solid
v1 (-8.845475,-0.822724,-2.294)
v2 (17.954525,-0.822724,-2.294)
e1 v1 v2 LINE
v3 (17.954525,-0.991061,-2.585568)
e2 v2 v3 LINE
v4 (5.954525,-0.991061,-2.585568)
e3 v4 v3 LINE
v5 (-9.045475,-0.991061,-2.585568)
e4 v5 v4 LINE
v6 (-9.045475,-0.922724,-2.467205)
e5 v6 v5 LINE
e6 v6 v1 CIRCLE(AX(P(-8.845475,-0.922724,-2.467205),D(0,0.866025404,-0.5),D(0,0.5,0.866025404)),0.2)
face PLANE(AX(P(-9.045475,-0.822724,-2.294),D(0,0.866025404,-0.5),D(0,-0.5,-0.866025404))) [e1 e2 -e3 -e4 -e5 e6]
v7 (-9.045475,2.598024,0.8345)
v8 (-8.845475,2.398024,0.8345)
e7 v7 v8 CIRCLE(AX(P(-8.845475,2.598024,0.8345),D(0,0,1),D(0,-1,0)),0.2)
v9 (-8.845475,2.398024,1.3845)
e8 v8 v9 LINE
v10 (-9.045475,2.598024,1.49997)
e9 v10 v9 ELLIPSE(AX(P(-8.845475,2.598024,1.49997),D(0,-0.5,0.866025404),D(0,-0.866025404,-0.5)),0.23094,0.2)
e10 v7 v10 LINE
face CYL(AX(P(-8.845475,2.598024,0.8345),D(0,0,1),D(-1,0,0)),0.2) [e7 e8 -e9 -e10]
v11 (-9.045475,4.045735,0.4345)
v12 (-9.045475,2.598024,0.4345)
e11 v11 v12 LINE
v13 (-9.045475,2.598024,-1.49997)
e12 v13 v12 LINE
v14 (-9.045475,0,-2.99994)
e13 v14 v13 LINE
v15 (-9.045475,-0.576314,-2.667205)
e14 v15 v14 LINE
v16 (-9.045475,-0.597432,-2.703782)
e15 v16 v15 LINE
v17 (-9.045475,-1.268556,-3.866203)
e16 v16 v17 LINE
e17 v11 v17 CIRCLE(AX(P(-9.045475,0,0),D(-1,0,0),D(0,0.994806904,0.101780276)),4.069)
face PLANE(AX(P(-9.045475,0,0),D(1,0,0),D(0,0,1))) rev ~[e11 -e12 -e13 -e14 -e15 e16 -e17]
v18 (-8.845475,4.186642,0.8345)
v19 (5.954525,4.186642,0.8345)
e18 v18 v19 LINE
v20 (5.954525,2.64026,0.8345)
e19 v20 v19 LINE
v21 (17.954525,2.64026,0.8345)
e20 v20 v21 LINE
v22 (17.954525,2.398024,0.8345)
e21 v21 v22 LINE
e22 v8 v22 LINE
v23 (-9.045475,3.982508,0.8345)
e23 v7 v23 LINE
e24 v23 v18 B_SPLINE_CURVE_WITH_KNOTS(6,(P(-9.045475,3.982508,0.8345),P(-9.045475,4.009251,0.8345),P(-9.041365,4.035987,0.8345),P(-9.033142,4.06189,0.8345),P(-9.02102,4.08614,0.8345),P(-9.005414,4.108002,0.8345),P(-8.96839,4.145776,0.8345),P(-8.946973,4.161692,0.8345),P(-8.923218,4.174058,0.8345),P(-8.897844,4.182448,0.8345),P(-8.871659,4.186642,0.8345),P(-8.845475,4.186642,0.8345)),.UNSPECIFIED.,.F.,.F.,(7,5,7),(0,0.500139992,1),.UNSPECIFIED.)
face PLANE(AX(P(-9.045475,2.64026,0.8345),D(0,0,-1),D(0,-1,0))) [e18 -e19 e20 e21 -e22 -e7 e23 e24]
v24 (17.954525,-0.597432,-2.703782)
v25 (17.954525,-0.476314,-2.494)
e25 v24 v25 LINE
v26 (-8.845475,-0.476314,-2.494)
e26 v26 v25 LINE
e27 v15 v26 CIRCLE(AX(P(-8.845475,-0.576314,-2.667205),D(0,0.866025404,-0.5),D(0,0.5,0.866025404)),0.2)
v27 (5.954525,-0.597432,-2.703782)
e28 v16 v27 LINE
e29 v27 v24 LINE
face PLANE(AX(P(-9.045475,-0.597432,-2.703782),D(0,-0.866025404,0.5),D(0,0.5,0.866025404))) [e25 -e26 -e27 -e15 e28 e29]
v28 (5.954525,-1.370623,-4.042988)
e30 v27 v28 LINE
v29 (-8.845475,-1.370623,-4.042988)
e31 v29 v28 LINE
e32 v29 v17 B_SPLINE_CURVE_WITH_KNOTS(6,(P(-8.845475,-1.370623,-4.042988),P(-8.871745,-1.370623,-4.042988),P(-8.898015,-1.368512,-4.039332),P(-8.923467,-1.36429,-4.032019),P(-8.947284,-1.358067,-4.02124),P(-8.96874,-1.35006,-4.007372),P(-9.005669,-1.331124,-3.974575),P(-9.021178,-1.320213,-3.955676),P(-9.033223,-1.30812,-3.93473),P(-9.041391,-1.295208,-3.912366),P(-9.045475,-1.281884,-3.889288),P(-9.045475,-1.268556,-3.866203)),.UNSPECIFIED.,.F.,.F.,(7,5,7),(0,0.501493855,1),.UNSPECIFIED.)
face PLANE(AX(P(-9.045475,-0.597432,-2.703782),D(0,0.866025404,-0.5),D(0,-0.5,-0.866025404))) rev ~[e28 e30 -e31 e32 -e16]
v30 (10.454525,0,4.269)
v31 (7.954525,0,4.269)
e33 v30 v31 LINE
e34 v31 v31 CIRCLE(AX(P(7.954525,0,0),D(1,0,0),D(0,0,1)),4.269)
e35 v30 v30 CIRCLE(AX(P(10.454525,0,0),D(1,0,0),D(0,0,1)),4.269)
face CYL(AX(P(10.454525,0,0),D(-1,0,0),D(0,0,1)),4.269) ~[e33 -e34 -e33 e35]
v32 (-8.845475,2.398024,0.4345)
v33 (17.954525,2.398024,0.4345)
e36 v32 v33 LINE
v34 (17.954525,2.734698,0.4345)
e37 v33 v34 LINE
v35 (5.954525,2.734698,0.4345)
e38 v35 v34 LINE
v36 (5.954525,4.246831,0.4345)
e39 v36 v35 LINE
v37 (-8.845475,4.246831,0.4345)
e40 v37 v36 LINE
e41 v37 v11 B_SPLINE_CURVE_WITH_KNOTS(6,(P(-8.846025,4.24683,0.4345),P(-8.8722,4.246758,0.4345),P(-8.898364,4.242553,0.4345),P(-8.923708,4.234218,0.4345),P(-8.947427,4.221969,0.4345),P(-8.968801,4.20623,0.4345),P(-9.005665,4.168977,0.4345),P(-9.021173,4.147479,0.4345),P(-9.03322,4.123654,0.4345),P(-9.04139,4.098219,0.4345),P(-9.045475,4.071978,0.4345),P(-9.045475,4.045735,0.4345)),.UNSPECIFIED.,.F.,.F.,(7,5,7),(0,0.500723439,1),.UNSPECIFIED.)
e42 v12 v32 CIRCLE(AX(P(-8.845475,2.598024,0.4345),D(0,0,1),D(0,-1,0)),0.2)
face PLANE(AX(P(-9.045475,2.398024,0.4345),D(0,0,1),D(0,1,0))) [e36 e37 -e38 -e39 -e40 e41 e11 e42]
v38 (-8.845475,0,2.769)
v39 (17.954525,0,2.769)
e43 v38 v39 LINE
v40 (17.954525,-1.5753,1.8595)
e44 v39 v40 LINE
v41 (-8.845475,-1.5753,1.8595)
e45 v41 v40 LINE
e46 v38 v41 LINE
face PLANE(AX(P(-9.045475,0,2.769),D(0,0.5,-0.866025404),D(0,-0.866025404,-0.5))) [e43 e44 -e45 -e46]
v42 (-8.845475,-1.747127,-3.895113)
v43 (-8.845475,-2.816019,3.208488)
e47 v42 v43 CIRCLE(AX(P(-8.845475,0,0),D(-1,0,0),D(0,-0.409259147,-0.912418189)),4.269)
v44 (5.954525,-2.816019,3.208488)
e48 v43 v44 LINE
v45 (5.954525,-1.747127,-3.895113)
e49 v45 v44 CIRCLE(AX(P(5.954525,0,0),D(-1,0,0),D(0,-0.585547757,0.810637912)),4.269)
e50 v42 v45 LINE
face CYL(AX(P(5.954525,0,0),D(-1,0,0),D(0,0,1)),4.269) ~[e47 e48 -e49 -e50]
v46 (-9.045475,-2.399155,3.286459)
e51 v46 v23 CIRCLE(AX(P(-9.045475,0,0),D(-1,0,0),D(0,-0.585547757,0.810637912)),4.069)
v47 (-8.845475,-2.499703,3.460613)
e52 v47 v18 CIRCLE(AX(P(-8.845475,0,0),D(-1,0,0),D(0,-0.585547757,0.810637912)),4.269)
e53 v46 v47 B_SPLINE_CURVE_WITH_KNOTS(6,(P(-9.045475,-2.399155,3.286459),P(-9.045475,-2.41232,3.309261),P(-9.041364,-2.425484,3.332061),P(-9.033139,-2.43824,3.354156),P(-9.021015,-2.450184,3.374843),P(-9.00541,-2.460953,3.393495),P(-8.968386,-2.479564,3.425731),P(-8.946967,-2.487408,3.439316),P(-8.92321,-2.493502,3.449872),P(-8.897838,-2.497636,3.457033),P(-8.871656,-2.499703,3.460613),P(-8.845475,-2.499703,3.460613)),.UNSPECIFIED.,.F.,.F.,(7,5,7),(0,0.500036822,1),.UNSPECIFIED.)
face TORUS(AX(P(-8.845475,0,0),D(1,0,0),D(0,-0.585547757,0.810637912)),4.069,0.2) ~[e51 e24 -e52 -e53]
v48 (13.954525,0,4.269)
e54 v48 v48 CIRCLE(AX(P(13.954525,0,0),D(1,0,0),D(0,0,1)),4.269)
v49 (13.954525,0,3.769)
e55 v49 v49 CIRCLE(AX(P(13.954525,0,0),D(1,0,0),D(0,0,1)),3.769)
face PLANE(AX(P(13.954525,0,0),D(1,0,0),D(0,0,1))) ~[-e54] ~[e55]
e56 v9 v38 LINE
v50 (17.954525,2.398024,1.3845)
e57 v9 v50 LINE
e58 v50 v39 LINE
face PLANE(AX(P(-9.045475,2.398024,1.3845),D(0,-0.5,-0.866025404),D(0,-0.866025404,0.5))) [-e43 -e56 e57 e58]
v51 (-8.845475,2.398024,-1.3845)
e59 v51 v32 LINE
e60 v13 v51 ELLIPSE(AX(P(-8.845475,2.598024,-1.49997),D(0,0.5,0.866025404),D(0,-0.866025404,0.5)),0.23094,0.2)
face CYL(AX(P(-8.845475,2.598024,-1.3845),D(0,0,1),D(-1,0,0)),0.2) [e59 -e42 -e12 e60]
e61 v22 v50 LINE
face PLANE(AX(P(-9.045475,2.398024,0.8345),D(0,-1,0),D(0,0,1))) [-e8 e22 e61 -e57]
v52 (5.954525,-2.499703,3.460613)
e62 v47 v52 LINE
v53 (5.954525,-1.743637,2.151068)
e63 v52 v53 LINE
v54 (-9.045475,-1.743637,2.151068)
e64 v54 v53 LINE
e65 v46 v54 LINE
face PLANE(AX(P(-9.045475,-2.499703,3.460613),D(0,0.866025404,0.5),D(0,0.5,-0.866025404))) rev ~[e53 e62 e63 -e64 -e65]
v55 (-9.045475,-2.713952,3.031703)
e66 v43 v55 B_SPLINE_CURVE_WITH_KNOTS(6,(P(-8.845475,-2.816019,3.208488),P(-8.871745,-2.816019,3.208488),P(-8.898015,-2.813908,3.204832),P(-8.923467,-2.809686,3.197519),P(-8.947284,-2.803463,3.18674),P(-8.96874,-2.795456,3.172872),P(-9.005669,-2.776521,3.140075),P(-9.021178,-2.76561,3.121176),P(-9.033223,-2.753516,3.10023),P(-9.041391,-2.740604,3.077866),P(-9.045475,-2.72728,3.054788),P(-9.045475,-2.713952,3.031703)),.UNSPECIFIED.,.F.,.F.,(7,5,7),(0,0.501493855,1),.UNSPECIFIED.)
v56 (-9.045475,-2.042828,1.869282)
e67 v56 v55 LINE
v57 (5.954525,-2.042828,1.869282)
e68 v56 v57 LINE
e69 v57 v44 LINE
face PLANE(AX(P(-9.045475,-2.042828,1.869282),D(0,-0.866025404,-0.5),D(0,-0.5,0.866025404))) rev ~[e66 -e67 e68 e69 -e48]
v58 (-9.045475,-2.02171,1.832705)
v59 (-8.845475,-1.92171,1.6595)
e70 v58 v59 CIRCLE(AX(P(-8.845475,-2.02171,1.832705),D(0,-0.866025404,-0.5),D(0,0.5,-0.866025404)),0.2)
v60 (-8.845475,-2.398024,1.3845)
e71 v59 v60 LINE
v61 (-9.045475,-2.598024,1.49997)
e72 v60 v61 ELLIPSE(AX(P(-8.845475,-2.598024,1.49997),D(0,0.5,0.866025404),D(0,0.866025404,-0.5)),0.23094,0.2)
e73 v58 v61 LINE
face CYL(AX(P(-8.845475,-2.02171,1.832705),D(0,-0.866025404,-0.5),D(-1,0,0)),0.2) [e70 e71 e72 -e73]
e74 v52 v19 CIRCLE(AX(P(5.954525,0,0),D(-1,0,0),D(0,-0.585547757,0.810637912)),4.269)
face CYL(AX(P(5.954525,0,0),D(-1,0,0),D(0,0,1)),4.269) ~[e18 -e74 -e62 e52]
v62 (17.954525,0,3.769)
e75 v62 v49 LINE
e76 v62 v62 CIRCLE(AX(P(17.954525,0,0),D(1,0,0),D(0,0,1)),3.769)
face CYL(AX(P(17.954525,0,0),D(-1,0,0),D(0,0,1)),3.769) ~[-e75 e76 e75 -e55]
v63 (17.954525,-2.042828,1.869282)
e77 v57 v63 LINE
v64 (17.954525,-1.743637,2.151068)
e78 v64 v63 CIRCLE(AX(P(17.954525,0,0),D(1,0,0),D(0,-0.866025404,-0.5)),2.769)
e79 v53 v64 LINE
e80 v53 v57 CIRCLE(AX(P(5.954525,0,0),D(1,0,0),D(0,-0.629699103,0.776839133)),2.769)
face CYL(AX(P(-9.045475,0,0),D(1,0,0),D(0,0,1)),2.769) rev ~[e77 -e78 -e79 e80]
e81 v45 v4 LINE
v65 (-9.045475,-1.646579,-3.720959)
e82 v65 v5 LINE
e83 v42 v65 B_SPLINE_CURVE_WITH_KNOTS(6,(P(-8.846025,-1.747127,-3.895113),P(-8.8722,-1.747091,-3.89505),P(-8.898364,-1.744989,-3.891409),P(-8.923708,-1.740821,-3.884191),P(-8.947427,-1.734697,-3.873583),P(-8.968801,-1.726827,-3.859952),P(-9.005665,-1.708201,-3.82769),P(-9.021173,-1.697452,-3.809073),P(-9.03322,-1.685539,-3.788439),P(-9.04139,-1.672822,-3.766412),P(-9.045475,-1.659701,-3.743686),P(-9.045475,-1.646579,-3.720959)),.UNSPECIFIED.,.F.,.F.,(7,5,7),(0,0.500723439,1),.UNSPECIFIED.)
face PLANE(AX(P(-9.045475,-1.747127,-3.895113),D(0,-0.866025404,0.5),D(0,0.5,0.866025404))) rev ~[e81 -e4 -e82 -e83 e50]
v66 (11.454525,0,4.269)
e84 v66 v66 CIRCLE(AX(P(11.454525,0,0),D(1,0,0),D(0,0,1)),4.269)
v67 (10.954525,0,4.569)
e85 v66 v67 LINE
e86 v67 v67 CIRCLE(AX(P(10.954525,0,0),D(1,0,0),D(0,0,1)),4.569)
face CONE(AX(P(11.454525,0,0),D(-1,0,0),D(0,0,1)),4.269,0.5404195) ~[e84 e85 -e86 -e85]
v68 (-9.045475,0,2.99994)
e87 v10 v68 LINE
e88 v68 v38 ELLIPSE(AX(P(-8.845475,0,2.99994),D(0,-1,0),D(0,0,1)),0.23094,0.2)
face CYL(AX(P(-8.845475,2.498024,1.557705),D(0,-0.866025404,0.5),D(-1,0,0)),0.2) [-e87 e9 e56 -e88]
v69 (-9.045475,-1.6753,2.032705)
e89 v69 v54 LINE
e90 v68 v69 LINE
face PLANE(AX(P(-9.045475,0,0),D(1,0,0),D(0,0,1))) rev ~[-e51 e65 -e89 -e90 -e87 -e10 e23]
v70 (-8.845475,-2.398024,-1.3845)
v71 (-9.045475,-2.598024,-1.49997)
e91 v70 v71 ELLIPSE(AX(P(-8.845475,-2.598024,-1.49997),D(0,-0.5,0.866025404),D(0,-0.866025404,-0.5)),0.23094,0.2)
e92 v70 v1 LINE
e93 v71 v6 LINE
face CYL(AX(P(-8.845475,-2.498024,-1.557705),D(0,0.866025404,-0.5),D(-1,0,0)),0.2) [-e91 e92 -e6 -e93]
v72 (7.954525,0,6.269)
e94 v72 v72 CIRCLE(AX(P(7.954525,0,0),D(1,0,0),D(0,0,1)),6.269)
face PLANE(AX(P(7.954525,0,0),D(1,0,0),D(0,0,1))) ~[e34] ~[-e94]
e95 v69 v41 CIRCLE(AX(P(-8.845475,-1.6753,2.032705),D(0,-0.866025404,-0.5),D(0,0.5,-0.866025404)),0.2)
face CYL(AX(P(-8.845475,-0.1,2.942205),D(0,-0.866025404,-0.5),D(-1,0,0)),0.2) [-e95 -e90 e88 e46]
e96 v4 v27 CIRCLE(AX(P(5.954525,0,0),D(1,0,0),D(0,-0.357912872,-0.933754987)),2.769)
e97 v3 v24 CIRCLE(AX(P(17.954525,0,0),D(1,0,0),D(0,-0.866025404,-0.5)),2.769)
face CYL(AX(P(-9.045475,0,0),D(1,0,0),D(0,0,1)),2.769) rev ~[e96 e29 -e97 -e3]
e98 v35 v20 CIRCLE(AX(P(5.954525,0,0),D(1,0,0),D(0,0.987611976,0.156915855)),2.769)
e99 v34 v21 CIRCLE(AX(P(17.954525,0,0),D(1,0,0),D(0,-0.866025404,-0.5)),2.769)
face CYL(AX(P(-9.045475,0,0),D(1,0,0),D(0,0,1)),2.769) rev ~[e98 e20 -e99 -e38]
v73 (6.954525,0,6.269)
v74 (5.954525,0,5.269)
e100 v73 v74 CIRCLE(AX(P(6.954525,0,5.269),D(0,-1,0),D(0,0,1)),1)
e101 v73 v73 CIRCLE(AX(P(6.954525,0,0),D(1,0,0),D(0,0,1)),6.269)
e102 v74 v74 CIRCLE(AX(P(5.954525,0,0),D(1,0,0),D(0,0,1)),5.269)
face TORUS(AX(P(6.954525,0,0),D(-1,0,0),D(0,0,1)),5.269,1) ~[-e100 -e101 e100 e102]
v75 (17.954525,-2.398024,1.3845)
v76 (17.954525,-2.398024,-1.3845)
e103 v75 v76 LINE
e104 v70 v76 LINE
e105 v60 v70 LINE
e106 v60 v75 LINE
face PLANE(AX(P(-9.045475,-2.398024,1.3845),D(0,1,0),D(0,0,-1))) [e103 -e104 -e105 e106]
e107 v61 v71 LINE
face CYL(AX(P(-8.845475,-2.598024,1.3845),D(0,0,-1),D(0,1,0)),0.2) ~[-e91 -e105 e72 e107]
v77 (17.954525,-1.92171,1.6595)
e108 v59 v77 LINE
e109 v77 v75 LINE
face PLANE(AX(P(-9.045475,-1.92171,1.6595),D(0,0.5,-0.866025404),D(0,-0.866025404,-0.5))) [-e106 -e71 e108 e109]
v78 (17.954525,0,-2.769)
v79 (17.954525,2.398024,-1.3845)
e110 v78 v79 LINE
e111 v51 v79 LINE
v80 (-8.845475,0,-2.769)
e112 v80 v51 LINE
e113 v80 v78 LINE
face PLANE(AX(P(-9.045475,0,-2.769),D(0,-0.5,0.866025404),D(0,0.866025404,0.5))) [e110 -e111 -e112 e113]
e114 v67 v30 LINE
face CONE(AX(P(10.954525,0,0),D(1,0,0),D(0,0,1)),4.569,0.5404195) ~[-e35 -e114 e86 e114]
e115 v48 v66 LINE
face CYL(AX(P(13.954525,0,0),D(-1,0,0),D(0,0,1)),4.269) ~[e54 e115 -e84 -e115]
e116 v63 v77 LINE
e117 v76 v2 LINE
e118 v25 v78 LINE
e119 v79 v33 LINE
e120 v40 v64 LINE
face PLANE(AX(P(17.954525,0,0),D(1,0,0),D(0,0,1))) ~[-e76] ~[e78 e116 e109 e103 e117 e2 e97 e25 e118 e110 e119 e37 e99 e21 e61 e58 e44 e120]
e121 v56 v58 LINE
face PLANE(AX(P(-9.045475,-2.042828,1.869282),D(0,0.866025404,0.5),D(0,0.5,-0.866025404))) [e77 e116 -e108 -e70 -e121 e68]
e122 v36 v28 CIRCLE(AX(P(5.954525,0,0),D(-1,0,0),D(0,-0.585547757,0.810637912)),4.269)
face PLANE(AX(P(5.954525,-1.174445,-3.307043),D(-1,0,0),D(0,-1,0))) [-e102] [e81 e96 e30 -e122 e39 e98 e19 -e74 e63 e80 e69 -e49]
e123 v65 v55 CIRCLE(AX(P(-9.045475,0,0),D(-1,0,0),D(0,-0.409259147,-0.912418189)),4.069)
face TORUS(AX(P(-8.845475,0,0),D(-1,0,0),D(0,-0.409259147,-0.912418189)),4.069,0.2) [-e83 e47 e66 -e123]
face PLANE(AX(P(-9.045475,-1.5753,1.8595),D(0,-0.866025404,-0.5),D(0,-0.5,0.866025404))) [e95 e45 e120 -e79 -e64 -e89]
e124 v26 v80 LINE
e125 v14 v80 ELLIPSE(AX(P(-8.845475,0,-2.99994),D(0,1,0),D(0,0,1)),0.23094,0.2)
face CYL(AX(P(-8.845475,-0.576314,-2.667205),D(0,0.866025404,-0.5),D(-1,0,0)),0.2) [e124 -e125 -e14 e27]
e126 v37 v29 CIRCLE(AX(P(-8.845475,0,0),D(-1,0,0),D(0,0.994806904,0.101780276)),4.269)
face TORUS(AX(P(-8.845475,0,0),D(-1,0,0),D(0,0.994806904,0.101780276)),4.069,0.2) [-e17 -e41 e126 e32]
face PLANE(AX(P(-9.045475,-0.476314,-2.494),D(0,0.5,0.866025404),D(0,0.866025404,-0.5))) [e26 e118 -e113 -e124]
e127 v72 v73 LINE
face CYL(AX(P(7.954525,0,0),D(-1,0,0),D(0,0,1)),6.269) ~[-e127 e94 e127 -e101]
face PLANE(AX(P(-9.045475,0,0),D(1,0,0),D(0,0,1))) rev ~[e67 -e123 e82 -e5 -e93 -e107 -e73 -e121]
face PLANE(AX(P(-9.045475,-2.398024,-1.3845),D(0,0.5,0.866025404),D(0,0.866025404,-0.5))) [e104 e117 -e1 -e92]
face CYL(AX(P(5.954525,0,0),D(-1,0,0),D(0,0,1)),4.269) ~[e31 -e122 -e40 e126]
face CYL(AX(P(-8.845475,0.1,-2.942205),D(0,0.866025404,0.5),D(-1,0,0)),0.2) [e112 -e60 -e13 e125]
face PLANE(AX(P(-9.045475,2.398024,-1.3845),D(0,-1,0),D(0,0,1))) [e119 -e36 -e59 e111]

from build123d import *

# Parameters (mm, degrees)
F2_R     = 1
F4_DEPTH = 27
F5_DEPTH = 27
F6_DEPTH = 15
F7_DEPTH = 15
F8_DEPTH = 15
F9_R     = 0.2


with BuildPart() as f1:
    # F0 (on Front) → F1 (revolve)
    with BuildSketch(Plane.XZ):
        Polygon((-9.0454753935, 4.269), (-9.0454753935, 2.769), (17.9545246065, 2.769), (17.9545246065, 3.769), (13.9545246065, 3.769), (13.9545246065, 4.269), (11.4545246065, 4.269), (10.9545246065, 4.569), (10.4545246065, 4.269), (7.9545246065, 4.269), (7.9545246065, 6.269), (5.9545246065, 6.269), (5.9545246065, 4.269), align=None)
    revolve(axis=Axis((2.1683473801, 0, 0), (1, 0, 0)))

    # F2
    f2_edges = [f1.edges().sort_by_distance(p)[0] for p in [
        (5.954525, 0, -6.269),
    ]]
    fillet(f2_edges, radius=F2_R)

    # F3 (on face) → F4 (join)
    with BuildSketch(Plane(origin=(-9.0454753935, 0, 0), x_dir=(0, -1, 0), z_dir=(-1, 0, 0))):
        with BuildLine():
            ThreePointArc((2.769, 0), (2.674648613, 0.7166699359), (2.3980243431, 1.3845))
            Line((2.3980243431, 1.3845), (2.3980243431, -1.3845))
            ThreePointArc((2.3980243431, -1.3845), (2.674648613, -0.7166699359), (2.769, 0))
        make_face()
    extrude(amount=-F4_DEPTH)

    # F3 (on face) → F5 (join)
    with BuildSketch(Plane(origin=(-9.0454753935, 0, 0), x_dir=(0, -1, 0), z_dir=(-1, 0, 0))):
        with BuildLine():
            ThreePointArc((2.769, 0), (2.674648613, 0.7166699359), (2.3980243431, 1.3845))
            Line((2.3980243431, 1.3845), (2.3980243431, -1.3845))
            ThreePointArc((2.3980243431, -1.3845), (2.674648613, -0.7166699359), (2.769, 0))
        make_face()
        with BuildLine():
            Line((1.921710371, 1.6595), (2.3980243431, 1.3845))
            ThreePointArc((2.3980243431, 1.3845), (2.2336171897, 1.6365559111), (2.0428279989, 1.8692818853))
            Line((2.0428279989, 1.8692818853), (1.921710371, 1.6595))
        make_face()
        with BuildLine():
            ThreePointArc((0.9910607425, -2.5855675595), (1.7978084575, -2.1060023148), (2.3980243431, -1.3845))
            Line((2.3980243431, -1.3845), (0.8227241336, -2.294))
            Line((0.8227241336, -2.294), (0.9910607425, -2.5855675595))
        make_face()
        with BuildLine():
            Line((0, 2.769), (1.5753002095, 1.8595))
            Line((1.5753002095, 1.8595), (1.7436368184, 2.1510675595))
            ThreePointArc((1.7436368184, 2.1510675595), (0.9249472763, 2.6099489528), (0, 2.769))
        make_face()
        with BuildLine():
            Line((0.5974316, -2.7037818853), (0.4763139721, -2.494))
            Line((0.4763139721, -2.494), (0, -2.769))
            ThreePointArc((0, -2.769), (0.3004903988, -2.7526471841), (0.5974316, -2.7037818853))
        make_face()
        with BuildLine():
            Line((-2.3980243431, 1.3845), (0, 2.769))
            ThreePointArc((0, 2.769), (-1.3845, 2.3980243431), (-2.3980243431, 1.3845))
        make_face()
        with BuildLine():
            ThreePointArc((-2.3980243431, -1.3845), (-1.3845, -2.3980243431), (0, -2.769))
            Line((0, -2.769), (-2.3980243431, -1.3845))
        make_face()
        with BuildLine():
            Line((-2.3980243431, 0.8345), (-2.3980243431, 1.3845))
            ThreePointArc((-2.3980243431, 1.3845), (-2.5341075885, 1.1160912731), (-2.640259599, 0.8345))
            Line((-2.640259599, 0.8345), (-2.3980243431, 0.8345))
        make_face()
        with BuildLine():
            ThreePointArc((-2.734697561, 0.4345), (-2.7227557338, -0.503946638), (-2.3980243431, -1.3845))
            Line((-2.3980243431, -1.3845), (-2.3980243431, 0.4345))
            Line((-2.3980243431, 0.4345), (-2.734697561, 0.4345))
        make_face()
    extrude(amount=-F5_DEPTH)

    # F3 (on face) → F6 (cut)
    with BuildSketch(Plane(origin=(-9.0454753935, 0, 0), x_dir=(0, -1, 0), z_dir=(-1, 0, 0))):
        with BuildLine():
            ThreePointArc((1.7436368184, 2.1510675595), (1.8984677361, 2.0157334286), (2.0428279989, 1.8692818853))
            Line((2.0428279989, 1.8692818853), (2.8160191704, 3.2084882783))
            ThreePointArc((2.8160191704, 3.2084882783), (2.6608491673, 3.3382993738), (2.4997033736, 3.4606132468))
            Line((2.4997033736, 3.4606132468), (1.7436368184, 2.1510675595))
        make_face()
    extrude(amount=-F6_DEPTH, mode=Mode.SUBTRACT)

    # F3 (on face) → F7 (cut)
    with BuildSketch(Plane(origin=(-9.0454753935, 0, 0), x_dir=(0, -1, 0), z_dir=(-1, 0, 0))):
        with BuildLine():
            Line((1.7471272977, -3.8951132468), (0.9910607425, -2.5855675595))
            ThreePointArc((0.9910607425, -2.5855675595), (0.7964424884, -2.651988002), (0.5974316, -2.7037818853))
            Line((0.5974316, -2.7037818853), (1.3706227715, -4.0429882783))
            ThreePointArc((1.3706227715, -4.0429882783), (1.5606274795, -3.9735126614), (1.7471272977, -3.8951132468))
        make_face()
    extrude(amount=-F7_DEPTH, mode=Mode.SUBTRACT)

    # F3 (on face) → F8 (cut)
    with BuildSketch(Plane(origin=(-9.0454753935, 0, 0), x_dir=(0, -1, 0), z_dir=(-1, 0, 0))):
        with BuildLine():
            Line((-2.640259599, 0.8345), (-4.1866419419, 0.8345))
            ThreePointArc((-4.1866419419, 0.8345), (-4.2214766468, 0.6352132876), (-4.2468306712, 0.4345))
            Line((-4.2468306712, 0.4345), (-2.734697561, 0.4345))
            ThreePointArc((-2.734697561, 0.4345), (-2.6949102244, 0.6362545734), (-2.640259599, 0.8345))
        make_face()
    extrude(amount=-F8_DEPTH, mode=Mode.SUBTRACT)

    # F9
    f9_edges = [f1.edges().sort_by_distance(p)[0] for p in [
        (-9.045475, 1.560627, 3.973513),
        (-9.045475, -4.221477, -0.635213),
        (-9.045475, 2.660849, -3.338299),
        (-9.045475, 2.398024, -0.475),
        (-9.045475, 1.199012, -2.07675),
        (-9.045475, -0.238157, -2.6315),
        (-9.045475, -2.398024, 0),
        (-9.045475, -2.159867, 1.522),
        (-9.045475, 1.199012, 2.07675),
        (-9.045475, -0.78765, 2.31425),
        (-9.045475, -1.610374, -1.83925),
        (-9.045475, 2.398024, 1.1095),
    ]]
    fillet(f9_edges, radius=F9_R)


solid = f1.part
